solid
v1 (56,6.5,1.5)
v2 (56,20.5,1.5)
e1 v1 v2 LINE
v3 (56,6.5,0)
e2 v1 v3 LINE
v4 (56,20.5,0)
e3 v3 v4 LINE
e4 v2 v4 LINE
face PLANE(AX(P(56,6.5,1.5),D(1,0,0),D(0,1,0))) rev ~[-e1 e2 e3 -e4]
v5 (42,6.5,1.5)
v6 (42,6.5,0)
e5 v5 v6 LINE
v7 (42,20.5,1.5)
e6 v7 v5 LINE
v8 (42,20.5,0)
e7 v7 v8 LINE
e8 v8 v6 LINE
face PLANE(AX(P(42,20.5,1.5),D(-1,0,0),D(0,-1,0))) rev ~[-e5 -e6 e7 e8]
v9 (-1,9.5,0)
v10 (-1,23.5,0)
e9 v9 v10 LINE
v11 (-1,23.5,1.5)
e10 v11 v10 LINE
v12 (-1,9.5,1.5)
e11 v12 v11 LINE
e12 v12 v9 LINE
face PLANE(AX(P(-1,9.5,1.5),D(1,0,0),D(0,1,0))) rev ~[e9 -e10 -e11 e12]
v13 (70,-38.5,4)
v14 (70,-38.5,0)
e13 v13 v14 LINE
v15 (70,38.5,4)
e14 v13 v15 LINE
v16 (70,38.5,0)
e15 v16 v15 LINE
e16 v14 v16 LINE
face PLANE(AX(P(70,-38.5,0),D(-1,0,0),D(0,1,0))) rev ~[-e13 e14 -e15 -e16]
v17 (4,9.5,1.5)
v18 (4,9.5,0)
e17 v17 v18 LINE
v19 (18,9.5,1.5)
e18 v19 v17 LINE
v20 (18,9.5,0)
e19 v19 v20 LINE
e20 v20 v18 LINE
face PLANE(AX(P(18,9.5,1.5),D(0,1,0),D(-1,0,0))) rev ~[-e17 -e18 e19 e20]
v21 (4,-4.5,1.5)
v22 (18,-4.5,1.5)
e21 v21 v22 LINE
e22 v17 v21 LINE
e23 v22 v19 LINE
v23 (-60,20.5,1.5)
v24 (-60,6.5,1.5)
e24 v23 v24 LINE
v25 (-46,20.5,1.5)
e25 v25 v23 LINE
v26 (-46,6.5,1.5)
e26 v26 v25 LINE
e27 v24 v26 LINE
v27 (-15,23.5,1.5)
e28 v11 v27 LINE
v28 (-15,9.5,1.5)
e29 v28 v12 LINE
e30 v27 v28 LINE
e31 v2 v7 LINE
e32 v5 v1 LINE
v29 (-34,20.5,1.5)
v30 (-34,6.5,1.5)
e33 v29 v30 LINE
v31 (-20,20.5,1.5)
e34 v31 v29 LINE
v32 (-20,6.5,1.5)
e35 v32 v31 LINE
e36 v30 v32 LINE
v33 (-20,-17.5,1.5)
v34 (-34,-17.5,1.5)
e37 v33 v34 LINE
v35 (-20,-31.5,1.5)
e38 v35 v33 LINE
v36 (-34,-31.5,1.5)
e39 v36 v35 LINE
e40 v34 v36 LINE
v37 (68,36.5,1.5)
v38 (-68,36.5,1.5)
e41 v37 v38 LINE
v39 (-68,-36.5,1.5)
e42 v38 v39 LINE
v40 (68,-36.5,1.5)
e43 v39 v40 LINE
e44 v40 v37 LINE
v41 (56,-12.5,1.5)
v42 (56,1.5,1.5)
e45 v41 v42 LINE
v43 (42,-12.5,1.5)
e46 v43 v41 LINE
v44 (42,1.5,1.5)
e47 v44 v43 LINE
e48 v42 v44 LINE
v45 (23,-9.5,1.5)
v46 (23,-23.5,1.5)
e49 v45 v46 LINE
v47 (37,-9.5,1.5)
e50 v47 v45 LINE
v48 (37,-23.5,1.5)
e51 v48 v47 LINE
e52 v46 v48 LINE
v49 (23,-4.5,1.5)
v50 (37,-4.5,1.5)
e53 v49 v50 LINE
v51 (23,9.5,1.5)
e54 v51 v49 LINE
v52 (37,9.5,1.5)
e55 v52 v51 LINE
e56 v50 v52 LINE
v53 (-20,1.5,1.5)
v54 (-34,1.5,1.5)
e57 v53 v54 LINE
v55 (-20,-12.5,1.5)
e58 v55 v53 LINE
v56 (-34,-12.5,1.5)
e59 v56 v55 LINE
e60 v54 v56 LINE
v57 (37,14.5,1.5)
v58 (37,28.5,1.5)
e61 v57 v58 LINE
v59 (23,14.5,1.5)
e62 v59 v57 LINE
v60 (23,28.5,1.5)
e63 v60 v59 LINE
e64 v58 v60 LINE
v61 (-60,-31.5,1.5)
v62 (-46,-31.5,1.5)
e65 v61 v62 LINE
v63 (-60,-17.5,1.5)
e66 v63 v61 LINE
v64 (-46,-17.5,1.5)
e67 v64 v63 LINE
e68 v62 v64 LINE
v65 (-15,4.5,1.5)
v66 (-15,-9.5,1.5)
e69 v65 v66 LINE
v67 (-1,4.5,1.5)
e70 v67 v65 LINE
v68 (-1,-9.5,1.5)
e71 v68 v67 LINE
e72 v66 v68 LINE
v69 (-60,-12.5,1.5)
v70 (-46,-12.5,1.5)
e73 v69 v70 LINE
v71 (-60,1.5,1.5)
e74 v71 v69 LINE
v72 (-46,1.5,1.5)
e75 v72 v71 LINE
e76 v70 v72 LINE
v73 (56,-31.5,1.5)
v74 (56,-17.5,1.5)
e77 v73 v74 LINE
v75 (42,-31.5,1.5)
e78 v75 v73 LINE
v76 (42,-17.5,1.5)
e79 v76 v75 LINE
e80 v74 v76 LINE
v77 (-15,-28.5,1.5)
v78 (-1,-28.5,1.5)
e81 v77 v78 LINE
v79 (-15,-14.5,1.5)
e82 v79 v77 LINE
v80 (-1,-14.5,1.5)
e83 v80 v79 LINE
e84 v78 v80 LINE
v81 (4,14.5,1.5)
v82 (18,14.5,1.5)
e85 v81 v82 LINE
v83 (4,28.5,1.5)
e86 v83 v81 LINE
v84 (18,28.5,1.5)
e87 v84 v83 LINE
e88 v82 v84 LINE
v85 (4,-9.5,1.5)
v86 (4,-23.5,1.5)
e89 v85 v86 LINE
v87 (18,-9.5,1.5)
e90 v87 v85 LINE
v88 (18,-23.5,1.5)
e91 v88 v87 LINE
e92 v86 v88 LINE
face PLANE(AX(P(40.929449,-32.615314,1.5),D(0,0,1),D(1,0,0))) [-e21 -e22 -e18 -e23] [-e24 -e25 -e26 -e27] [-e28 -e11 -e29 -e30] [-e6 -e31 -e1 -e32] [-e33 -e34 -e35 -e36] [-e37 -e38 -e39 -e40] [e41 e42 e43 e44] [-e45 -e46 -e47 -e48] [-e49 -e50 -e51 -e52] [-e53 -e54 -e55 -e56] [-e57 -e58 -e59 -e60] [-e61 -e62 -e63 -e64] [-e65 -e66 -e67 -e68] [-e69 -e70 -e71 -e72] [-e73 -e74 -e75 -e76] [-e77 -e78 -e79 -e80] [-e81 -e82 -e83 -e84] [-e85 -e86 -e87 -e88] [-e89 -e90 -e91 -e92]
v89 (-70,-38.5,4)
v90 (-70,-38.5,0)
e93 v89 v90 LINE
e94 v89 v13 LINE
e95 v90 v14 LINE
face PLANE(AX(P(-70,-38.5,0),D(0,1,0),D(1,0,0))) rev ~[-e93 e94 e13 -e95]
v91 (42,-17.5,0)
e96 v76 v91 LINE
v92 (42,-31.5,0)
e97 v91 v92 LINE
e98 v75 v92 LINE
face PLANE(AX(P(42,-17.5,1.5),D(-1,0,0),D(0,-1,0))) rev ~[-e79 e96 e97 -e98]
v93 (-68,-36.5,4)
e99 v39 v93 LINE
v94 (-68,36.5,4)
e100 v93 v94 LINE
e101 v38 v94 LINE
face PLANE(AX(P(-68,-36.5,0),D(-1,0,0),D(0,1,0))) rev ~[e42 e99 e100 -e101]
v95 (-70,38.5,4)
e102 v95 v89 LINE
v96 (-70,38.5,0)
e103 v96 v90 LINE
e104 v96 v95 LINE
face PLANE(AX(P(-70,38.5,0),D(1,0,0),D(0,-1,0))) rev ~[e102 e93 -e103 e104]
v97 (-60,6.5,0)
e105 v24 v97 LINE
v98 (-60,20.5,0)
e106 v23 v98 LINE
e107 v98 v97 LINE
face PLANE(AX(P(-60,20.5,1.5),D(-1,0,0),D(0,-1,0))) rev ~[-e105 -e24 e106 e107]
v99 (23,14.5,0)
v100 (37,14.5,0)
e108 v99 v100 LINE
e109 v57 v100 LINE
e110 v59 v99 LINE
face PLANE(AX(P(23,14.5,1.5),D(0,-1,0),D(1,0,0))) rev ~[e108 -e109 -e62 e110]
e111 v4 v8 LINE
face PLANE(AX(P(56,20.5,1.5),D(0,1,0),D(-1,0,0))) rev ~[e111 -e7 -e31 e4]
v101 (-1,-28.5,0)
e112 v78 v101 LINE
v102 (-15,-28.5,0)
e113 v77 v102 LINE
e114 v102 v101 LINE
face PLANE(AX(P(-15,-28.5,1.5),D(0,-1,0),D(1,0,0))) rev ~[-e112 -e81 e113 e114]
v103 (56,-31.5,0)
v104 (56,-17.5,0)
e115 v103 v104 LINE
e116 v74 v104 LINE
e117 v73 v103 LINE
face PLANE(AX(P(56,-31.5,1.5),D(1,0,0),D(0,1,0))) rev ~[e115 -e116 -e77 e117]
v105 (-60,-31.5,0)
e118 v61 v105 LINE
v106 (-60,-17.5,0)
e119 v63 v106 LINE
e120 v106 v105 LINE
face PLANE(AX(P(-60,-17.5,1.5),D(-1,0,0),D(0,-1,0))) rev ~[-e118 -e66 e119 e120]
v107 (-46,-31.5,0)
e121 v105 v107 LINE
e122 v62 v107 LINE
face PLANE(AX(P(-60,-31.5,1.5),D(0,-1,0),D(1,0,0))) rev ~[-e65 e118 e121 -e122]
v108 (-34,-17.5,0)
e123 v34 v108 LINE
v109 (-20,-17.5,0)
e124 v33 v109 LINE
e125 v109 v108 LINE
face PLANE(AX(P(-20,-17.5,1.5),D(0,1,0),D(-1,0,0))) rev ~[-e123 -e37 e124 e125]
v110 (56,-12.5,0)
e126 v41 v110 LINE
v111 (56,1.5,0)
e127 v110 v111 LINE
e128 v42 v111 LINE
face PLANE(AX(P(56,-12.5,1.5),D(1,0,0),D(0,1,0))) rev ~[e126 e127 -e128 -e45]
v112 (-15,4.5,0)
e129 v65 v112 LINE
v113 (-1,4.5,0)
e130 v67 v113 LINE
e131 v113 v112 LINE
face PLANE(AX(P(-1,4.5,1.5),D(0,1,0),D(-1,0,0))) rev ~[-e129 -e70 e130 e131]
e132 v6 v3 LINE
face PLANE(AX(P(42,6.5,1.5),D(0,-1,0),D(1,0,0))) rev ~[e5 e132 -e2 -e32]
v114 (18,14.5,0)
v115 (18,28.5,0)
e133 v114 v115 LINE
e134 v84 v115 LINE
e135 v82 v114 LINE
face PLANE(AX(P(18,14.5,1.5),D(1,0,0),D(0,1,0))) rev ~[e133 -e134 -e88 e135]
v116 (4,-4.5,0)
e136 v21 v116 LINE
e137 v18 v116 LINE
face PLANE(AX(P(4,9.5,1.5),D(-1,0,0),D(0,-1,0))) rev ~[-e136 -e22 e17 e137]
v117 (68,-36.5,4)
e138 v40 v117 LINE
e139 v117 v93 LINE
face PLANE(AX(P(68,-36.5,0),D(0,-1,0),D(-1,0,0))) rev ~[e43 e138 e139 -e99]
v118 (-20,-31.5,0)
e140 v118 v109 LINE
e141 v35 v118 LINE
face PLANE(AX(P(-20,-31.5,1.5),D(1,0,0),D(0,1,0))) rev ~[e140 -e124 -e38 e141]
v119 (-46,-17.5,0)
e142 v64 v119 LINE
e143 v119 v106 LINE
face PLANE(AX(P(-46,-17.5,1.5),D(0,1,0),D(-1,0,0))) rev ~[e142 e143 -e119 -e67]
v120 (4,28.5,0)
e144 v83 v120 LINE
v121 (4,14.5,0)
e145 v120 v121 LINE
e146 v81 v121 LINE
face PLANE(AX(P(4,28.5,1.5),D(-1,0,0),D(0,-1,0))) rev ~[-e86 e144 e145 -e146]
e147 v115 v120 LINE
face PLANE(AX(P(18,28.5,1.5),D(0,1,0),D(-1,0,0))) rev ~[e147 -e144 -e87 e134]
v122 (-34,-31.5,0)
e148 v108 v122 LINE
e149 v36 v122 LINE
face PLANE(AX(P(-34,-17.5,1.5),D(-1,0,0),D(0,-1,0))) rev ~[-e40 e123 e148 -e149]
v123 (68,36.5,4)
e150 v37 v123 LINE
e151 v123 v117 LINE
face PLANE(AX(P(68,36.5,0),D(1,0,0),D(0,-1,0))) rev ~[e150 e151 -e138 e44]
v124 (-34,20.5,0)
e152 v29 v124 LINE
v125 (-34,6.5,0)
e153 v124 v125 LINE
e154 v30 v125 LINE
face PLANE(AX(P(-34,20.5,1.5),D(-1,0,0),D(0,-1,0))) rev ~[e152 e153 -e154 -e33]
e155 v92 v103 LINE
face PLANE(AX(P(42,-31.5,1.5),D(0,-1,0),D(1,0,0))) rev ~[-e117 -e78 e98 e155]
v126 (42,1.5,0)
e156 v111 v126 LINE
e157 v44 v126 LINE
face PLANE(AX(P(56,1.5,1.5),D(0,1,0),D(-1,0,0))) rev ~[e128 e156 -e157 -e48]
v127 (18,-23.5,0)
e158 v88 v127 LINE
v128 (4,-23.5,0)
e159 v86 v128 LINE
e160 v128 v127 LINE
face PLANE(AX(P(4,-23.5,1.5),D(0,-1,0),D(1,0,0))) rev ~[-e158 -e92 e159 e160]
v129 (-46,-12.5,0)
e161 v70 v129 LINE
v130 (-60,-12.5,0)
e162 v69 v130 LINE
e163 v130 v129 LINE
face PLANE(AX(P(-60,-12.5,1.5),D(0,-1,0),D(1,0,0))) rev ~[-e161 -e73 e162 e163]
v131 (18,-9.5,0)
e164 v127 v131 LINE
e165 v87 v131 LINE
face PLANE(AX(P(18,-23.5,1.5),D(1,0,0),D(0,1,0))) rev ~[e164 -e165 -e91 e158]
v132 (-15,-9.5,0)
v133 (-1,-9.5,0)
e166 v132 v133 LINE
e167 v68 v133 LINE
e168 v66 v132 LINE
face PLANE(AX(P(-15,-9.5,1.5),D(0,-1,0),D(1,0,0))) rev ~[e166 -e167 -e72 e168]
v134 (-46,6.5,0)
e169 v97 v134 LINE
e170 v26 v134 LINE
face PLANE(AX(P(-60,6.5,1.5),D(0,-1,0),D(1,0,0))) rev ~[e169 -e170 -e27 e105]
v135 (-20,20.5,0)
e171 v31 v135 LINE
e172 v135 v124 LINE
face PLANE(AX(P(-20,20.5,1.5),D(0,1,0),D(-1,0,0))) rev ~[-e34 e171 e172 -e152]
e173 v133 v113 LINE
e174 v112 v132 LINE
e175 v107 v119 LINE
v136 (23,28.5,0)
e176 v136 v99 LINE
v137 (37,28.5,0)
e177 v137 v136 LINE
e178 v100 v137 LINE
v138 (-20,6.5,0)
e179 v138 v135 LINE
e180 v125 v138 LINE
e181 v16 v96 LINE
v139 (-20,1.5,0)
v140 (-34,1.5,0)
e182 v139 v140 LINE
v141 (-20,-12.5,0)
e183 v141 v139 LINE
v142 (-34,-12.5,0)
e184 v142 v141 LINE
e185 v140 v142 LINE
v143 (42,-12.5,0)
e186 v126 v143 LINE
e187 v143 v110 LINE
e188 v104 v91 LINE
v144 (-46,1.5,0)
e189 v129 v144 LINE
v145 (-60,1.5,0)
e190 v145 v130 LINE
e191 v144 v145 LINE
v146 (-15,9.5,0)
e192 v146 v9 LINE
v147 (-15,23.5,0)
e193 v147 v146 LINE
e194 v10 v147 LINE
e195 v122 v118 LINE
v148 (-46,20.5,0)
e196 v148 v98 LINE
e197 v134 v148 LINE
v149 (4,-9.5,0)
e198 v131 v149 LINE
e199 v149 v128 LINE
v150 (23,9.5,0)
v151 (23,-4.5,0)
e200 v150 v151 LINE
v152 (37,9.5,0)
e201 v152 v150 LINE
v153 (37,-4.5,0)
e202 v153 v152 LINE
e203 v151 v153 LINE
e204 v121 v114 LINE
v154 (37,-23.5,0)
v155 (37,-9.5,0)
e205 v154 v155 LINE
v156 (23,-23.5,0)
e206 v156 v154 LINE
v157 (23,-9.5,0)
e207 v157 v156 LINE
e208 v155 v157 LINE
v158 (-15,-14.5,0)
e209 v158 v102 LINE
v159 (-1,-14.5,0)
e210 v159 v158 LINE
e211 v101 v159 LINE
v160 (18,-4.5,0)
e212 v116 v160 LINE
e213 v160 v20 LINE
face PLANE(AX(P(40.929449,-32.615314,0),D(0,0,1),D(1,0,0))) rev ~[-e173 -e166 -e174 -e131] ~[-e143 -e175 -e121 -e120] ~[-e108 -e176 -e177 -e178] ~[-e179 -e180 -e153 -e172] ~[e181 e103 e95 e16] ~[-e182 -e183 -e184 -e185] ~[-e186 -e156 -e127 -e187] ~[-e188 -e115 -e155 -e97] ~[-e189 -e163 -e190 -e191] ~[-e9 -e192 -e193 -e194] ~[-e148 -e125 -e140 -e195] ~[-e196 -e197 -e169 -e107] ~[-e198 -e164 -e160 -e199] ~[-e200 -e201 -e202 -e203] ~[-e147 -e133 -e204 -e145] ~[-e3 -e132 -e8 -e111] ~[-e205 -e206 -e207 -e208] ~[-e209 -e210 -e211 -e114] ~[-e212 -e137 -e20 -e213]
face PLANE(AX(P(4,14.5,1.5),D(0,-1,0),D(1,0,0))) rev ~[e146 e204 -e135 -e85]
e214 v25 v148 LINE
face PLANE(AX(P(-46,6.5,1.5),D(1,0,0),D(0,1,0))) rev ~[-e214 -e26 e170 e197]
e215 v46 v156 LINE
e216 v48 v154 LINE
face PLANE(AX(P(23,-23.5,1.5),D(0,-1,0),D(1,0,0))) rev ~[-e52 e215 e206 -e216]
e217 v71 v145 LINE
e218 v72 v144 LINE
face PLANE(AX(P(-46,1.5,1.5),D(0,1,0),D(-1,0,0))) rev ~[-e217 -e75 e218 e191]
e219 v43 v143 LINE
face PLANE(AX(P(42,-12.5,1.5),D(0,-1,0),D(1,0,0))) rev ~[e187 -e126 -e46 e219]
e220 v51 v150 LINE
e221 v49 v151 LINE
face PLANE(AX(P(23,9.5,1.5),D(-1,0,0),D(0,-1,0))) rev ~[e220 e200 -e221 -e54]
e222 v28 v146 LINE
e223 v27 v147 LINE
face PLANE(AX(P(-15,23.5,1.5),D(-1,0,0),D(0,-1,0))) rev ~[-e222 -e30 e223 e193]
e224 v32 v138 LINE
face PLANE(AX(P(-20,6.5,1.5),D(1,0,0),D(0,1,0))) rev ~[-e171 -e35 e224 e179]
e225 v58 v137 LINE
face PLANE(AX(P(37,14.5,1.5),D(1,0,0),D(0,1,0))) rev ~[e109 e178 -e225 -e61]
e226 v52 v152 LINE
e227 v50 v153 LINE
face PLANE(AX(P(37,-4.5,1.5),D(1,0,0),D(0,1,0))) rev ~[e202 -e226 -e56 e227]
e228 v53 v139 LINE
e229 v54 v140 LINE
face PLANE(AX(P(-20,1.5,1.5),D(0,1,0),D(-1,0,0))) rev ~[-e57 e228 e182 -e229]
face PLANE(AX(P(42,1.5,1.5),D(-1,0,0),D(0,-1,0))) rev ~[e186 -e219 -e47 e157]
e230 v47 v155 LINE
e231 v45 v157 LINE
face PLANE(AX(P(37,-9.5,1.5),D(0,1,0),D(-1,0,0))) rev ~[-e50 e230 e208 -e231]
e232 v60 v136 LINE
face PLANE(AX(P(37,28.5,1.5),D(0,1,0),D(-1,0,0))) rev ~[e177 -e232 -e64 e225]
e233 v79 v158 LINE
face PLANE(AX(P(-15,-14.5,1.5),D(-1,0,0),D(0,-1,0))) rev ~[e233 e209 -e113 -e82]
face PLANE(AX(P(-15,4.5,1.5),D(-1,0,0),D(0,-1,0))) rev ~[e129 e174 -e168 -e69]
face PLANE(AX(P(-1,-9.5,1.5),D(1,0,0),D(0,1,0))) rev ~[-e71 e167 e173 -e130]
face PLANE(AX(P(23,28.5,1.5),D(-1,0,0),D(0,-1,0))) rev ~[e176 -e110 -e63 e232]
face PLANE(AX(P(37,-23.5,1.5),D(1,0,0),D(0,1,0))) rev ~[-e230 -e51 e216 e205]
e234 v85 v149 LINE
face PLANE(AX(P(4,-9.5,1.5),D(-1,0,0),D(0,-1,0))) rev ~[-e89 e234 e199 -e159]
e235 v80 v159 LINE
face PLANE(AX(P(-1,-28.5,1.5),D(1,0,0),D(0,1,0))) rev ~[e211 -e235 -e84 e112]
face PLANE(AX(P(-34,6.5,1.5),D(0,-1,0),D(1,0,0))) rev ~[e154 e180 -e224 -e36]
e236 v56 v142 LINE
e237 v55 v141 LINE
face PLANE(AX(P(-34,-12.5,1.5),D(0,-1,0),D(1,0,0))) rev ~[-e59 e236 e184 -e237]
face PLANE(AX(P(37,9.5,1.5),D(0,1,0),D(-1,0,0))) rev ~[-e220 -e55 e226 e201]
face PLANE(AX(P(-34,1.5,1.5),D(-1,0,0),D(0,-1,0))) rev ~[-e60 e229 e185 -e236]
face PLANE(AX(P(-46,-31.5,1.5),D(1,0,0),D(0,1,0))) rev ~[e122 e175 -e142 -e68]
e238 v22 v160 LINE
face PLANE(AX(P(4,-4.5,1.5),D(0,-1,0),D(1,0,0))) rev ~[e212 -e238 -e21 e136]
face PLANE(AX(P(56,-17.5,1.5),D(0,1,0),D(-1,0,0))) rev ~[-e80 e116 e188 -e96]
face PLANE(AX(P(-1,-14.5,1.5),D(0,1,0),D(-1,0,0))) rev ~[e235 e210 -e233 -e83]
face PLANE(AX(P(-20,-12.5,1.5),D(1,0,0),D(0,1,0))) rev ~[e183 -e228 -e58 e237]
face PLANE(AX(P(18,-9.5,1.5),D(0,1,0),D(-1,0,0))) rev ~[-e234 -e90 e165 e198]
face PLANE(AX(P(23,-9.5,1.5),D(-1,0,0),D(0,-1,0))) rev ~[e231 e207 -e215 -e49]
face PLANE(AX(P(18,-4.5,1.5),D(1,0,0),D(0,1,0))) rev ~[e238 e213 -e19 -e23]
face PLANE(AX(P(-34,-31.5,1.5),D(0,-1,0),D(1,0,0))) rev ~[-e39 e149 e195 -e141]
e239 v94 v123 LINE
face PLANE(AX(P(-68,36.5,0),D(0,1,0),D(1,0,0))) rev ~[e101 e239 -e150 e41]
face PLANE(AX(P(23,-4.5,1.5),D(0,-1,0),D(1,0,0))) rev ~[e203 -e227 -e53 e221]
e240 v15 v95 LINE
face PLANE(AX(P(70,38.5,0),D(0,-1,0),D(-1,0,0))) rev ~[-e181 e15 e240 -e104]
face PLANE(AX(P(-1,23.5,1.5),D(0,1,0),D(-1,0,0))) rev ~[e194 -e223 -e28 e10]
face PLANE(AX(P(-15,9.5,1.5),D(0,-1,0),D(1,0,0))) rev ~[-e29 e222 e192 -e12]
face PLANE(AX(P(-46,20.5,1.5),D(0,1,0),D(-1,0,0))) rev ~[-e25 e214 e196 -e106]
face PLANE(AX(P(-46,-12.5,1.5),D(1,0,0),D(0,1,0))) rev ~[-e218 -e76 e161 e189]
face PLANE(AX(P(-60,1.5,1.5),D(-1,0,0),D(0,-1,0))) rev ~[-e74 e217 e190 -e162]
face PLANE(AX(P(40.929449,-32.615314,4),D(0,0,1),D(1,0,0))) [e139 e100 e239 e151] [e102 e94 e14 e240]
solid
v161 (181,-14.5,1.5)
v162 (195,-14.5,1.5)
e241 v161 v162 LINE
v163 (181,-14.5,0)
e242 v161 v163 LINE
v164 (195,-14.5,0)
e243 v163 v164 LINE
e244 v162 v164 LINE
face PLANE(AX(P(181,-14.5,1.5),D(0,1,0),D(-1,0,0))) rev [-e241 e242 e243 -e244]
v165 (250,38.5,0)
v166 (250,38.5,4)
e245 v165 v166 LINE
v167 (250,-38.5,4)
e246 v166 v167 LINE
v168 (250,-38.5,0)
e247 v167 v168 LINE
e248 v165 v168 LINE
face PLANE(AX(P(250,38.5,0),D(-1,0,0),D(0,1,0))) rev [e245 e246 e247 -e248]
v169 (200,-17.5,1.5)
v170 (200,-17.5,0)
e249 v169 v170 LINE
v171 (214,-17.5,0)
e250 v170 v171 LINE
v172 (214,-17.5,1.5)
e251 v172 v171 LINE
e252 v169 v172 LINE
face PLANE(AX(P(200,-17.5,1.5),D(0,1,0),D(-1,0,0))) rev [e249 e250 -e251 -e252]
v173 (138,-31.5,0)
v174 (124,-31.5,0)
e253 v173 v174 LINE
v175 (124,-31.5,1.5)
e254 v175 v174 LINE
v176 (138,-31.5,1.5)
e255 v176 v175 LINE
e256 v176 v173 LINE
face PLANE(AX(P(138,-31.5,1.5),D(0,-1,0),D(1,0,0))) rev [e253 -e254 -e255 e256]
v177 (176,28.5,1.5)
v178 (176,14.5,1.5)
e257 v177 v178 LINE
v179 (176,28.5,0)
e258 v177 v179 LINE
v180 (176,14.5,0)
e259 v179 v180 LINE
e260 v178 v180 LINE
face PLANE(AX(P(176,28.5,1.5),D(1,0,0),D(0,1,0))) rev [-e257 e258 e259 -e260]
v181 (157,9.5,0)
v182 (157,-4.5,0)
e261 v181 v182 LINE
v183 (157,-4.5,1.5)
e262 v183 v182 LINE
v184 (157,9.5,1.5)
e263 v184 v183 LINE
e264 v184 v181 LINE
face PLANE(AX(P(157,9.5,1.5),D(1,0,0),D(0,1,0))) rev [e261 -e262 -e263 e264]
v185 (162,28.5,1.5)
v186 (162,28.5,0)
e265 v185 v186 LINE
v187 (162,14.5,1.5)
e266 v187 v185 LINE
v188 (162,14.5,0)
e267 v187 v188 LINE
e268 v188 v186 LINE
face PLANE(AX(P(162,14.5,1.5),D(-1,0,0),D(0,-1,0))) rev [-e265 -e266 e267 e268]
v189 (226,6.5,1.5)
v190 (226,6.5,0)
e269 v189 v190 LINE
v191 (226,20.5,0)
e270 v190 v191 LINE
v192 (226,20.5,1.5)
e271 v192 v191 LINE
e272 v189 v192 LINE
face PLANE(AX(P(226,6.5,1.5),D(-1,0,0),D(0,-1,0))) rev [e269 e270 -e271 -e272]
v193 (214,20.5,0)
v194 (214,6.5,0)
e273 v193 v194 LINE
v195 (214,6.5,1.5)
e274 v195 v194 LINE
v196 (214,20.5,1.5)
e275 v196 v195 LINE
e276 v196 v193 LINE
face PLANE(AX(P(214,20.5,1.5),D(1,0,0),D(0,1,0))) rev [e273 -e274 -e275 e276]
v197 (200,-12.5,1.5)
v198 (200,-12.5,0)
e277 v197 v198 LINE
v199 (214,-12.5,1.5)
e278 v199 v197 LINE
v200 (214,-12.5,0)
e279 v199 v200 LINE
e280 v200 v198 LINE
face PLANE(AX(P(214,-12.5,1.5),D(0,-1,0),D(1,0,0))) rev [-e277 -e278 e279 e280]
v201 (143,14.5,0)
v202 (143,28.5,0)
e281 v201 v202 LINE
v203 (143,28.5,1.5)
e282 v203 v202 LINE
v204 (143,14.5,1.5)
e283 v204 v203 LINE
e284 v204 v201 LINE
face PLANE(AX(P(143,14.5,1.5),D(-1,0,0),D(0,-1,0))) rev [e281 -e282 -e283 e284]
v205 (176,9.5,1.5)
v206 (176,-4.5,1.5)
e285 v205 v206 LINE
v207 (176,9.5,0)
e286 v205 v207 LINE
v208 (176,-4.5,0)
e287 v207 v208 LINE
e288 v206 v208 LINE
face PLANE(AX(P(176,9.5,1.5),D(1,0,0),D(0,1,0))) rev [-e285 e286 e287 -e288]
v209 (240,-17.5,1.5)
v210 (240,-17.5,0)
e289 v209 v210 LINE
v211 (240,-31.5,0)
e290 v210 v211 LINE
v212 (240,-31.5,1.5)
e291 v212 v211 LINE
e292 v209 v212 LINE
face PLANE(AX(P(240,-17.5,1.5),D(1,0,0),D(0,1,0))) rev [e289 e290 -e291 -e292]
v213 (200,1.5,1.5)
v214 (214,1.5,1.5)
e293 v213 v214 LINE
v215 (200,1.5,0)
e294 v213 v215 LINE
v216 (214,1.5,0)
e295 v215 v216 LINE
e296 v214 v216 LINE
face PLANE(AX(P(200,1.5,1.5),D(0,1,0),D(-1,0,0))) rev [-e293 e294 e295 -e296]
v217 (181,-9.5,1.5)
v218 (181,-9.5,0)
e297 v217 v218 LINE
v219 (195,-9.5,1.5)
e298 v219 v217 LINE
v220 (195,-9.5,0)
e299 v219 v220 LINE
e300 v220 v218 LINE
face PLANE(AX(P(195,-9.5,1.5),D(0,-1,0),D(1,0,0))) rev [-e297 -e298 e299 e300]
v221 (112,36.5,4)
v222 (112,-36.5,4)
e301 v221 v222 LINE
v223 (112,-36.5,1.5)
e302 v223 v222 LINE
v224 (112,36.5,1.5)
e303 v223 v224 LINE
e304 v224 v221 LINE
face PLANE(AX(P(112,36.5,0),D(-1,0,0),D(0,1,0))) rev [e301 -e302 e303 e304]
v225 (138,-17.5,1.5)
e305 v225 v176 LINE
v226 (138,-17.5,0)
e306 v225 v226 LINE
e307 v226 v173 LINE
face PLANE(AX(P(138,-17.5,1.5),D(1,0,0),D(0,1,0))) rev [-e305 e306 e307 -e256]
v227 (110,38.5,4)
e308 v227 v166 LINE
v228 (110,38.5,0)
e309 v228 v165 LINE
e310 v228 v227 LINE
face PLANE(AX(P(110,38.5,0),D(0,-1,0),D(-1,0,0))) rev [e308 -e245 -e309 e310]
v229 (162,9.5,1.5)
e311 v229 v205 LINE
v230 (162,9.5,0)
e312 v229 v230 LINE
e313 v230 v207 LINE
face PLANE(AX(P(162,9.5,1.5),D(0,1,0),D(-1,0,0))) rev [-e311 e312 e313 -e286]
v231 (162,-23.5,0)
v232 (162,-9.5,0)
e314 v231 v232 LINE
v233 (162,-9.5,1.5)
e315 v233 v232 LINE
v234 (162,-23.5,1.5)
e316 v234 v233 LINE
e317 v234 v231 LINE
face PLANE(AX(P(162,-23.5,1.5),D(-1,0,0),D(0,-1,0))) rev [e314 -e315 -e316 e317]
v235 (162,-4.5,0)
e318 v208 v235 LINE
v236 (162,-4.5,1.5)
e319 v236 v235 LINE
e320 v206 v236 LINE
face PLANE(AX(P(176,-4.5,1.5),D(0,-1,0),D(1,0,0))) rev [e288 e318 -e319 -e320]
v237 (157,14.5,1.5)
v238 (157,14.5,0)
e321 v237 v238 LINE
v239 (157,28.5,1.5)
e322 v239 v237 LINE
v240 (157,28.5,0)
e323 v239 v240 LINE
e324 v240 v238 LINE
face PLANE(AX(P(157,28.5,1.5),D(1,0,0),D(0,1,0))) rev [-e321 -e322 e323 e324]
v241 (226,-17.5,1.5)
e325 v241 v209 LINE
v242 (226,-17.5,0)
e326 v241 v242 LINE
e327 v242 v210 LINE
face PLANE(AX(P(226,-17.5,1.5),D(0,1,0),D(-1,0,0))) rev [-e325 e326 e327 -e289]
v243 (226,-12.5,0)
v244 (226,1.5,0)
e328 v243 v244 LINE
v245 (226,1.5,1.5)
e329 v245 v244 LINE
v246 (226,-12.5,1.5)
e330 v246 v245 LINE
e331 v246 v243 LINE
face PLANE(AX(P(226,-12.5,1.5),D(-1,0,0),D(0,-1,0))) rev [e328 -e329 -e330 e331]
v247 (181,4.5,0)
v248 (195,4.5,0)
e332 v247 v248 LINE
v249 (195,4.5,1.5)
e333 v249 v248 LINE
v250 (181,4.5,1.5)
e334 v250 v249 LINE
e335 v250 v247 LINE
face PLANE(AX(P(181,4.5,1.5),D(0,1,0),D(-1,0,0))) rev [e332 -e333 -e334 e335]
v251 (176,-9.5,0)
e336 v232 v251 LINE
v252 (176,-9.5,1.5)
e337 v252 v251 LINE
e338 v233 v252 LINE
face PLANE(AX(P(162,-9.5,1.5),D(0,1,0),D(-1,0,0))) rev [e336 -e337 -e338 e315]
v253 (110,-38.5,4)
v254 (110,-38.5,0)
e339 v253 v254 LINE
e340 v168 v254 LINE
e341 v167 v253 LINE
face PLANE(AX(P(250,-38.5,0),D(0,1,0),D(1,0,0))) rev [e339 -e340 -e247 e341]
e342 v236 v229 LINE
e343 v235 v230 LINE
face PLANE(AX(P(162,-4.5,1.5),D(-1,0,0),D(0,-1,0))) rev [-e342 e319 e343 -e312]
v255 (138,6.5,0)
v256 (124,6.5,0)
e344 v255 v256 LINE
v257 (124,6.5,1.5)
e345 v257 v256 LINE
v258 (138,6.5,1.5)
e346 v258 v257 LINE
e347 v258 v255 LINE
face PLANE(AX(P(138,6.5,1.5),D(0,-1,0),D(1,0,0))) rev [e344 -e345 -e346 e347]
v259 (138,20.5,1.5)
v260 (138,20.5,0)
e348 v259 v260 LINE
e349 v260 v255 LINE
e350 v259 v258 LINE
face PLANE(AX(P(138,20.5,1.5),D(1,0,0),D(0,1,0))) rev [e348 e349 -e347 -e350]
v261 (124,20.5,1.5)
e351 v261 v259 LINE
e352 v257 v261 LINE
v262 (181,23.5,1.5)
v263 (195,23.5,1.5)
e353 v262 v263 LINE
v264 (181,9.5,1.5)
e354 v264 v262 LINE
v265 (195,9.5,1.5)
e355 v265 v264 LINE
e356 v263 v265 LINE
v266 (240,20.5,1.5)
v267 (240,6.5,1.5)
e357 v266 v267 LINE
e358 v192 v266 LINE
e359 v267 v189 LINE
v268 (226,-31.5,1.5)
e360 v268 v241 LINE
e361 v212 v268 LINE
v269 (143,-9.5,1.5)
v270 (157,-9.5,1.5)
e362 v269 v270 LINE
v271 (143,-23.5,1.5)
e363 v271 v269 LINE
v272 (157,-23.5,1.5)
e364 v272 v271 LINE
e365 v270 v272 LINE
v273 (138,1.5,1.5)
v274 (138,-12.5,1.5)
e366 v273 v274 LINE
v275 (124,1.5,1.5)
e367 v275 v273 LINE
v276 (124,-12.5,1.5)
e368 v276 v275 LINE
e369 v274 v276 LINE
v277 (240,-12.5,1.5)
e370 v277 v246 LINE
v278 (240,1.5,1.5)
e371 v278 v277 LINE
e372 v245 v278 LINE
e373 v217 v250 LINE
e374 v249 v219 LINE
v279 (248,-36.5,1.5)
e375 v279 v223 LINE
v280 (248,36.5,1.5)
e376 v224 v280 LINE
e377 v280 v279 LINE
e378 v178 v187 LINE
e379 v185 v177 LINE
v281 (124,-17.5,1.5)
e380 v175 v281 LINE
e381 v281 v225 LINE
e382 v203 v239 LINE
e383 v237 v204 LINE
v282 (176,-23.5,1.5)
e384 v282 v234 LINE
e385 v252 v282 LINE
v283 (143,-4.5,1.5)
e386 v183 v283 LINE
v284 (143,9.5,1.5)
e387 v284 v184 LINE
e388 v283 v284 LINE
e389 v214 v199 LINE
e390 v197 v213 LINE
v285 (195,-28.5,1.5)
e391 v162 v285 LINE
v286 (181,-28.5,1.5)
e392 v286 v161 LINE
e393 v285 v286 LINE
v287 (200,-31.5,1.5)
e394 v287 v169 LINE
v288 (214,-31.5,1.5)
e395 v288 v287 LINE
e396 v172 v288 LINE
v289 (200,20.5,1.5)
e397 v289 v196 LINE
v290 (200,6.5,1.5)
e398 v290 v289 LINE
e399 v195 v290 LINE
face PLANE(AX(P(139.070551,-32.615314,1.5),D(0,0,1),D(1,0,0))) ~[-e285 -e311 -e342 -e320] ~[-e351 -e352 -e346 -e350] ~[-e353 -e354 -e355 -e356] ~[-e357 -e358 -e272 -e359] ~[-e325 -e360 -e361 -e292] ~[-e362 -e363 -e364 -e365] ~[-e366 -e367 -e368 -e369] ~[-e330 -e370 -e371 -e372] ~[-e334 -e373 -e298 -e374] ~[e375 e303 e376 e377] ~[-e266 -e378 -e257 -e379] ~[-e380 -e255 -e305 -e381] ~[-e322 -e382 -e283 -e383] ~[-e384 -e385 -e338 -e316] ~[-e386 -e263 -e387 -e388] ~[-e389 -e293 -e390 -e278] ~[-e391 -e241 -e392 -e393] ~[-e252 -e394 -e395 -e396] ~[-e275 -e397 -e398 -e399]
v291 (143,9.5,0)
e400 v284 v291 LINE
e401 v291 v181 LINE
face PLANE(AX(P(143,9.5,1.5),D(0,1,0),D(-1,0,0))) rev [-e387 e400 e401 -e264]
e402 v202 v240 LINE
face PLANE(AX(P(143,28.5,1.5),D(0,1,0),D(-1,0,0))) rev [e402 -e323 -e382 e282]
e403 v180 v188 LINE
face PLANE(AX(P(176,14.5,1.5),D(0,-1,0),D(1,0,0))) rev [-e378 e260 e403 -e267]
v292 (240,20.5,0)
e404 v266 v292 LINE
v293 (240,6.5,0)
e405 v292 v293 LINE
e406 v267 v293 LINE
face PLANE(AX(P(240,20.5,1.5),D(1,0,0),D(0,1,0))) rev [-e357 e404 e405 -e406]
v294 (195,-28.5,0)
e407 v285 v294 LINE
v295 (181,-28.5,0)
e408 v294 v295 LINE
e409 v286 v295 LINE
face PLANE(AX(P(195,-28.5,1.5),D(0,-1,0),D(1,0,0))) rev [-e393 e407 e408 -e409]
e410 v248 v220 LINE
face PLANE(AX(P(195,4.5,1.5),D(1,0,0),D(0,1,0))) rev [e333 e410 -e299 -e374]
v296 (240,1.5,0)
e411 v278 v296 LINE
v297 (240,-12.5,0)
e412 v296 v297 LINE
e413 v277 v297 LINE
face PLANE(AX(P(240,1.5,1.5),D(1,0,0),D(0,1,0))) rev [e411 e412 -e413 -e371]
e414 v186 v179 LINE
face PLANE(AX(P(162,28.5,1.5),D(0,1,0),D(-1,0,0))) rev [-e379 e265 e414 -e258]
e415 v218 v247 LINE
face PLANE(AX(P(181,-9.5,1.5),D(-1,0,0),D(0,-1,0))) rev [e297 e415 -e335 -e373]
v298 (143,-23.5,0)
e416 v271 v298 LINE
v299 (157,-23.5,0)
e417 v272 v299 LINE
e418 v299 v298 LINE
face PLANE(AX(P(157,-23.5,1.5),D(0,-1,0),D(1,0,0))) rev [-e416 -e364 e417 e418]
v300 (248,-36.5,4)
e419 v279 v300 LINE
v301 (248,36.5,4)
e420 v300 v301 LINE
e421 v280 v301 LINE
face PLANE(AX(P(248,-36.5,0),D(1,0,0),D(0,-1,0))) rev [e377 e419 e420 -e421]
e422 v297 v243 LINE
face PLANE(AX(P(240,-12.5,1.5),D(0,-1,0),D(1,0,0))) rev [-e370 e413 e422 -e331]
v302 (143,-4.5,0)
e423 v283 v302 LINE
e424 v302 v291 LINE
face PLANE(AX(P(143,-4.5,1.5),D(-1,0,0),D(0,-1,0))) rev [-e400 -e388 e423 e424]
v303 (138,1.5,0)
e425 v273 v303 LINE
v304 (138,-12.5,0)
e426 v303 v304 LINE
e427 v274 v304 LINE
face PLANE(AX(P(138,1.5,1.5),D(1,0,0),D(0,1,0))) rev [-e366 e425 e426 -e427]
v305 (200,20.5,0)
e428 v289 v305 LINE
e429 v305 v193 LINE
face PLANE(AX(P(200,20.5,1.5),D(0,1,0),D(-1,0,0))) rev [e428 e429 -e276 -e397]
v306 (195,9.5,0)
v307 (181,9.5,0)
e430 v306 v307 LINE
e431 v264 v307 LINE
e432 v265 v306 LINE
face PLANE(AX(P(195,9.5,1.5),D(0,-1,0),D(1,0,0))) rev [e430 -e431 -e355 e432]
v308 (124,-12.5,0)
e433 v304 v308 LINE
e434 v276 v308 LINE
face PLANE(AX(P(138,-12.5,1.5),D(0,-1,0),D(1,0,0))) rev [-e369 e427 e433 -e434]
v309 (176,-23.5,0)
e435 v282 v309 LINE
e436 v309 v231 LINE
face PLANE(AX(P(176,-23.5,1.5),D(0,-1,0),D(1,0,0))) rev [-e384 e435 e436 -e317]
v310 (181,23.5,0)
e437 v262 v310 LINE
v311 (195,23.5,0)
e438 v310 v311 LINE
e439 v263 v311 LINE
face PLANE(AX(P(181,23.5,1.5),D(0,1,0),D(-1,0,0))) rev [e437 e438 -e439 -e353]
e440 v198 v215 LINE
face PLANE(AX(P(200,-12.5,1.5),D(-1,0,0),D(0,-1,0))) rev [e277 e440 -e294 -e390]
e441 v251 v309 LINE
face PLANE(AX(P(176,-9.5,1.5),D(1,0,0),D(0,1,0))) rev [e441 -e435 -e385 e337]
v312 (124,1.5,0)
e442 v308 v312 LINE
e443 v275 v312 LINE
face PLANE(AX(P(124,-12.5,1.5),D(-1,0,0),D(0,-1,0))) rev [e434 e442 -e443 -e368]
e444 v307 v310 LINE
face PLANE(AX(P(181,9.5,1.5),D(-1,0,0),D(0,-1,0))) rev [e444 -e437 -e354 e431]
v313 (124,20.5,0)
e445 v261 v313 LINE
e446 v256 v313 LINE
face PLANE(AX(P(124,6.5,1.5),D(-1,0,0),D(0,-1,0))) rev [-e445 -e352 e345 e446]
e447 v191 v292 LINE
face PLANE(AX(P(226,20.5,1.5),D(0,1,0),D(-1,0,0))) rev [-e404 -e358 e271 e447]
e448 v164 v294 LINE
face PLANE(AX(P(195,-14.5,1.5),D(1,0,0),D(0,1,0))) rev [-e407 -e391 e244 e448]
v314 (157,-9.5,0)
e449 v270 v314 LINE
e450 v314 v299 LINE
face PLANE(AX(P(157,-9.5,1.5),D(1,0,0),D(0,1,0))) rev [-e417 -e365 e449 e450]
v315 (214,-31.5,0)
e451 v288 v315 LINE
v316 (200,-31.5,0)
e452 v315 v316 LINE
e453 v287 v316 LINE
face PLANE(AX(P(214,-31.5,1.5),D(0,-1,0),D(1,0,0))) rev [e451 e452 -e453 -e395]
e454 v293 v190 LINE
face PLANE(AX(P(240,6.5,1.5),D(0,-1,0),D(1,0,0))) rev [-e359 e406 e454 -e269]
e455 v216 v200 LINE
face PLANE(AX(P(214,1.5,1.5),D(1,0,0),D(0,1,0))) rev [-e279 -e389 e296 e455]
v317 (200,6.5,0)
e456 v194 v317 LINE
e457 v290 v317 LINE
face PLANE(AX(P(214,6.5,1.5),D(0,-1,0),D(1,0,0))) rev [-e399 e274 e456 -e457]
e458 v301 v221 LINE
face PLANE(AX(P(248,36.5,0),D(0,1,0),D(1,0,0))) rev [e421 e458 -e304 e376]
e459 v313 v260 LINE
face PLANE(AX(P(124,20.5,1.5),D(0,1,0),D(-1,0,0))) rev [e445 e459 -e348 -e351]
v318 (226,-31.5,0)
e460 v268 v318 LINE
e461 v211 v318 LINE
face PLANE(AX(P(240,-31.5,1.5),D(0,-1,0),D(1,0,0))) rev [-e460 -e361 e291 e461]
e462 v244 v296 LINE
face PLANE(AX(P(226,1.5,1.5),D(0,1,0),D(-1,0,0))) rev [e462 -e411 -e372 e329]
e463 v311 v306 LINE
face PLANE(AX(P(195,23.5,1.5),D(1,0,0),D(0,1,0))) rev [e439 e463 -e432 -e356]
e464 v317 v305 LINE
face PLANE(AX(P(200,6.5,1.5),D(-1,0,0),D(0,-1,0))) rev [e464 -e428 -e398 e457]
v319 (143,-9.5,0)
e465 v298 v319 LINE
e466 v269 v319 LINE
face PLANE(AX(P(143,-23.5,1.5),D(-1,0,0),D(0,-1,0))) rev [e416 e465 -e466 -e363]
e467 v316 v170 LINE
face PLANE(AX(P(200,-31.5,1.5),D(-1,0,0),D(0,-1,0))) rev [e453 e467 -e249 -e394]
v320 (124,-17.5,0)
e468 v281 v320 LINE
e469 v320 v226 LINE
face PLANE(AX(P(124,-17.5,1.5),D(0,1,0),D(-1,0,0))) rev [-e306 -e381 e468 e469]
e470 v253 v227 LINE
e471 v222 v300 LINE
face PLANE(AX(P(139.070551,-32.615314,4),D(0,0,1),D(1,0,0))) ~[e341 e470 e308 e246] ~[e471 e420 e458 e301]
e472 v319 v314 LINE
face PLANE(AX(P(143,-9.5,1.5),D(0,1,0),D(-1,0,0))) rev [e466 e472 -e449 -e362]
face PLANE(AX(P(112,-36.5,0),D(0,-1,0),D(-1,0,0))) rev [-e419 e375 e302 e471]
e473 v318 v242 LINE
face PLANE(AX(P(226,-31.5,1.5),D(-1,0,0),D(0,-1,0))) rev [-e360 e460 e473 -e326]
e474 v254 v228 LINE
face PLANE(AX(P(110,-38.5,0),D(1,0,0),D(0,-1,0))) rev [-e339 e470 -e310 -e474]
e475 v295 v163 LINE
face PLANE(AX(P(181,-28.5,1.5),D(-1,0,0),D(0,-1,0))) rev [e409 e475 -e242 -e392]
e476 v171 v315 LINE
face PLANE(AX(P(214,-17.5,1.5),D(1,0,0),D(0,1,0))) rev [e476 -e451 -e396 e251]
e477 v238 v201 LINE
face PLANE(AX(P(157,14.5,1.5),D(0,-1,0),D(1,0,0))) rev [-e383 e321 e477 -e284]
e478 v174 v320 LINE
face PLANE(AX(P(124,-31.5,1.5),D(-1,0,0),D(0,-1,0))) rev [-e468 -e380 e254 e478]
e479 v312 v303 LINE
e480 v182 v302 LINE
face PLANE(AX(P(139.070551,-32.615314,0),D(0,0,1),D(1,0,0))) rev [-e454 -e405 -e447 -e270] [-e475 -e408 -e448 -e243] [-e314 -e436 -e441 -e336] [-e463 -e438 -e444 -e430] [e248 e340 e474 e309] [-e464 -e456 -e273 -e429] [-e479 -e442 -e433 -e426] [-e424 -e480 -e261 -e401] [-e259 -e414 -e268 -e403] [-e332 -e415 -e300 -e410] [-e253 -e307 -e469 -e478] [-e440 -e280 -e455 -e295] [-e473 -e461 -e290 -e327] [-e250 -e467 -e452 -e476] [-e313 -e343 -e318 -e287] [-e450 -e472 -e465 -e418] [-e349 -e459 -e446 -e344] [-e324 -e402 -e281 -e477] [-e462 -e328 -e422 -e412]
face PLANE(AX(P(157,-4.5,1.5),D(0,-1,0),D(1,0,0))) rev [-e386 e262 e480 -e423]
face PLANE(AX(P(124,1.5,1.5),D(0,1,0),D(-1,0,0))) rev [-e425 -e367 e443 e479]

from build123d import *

# Parameters (mm, degrees)
F1_DEPTH = 1.5
F3_DEPTH = 25
F4_DEPTH = 4


# Not quite as in the source:
# - a feature names something its author has since deleted; it is built from what else it names


with BuildPart() as f1:
    # F0 (on Top) → F1 (new body)
    with BuildSketch(Plane.XY):
        Polygon((-9.6456400305, -38.5), (70, -38.5), (70, -5.2260886878), (68, -5.2260886878), (68, -36.5), (-9.6456400305, -36.5), align=None)
        Polygon((-70, -38.5), (-9.6456400305, -38.5), (-9.6456400305, -36.5), (-68, -36.5), (-68, 2.6378679238), (-70, 2.6378679238), align=None)
        Polygon((-70, 38.5), (-70, 2.6378679238), (-68, 2.6378679238), (-68, 36.5), (-20.2697571367, 36.5), (-20.2697571367, 38.5), align=None)
        Polygon((68, -5.2260886878), (70, -5.2260886878), (70, 38.5), (-20.2697571367, 38.5), (-20.2697571367, 36.5), (68, 36.5), align=None)
        Polygon((-68, -36.5), (-9.6456400305, -36.5), (68, -36.5), (68, -5.2260886878), (68, 36.5), (-20.2697571367, 36.5), (-68, 36.5), (-68, 2.6378679238), align=None)
    extrude(amount=F1_DEPTH)

    # F2 (on face) → F3 (cut)
    with BuildSketch(Plane.XY.offset(1.5)):
        Polygon((56, -17.5), (49, -17.5), (42, -17.5), (42, -31.5), (56, -31.5), align=None)
        Polygon((-1, 23.5), (-8, 23.5), (-15, 23.5), (-15, 17.9919603638), (-15, 9.5), (-8, 9.5), (-1, 9.5), (-1, 14.5402538426), align=None)
        Polygon((-1, 4.5), (-8, 4.5), (-15, 4.5), (-15, -1.0080396362), (-15, -9.5), (-8, -9.5), (-1, -9.5), (-1, 0.6484970983), align=None)
        Polygon((-1, -14.5), (-8, -14.5), (-15, -14.5), (-15, -14.8997963805), (-15, -28.5), (-1, -28.5), align=None)
        Polygon((18, 28.5), (11, 28.5), (4, 28.5), (4, 14.5402538426), (4, 14.5), (11, 14.5), (18, 14.5), (18, 19.3217483706), align=None)
        Polygon((18, 9.5), (11, 9.5), (4, 9.5), (4, -4.5), (11, -4.5), (18, -4.5), (18, 0.3217483706), align=None)
        Polygon((18, -9.5), (11, -9.5), (4, -9.5), (4, -23.5), (18, -23.5), (18, -13.5700083736), align=None)
        Polygon((37, -9.5), (30, -9.5), (23, -9.5), (23, -23.5), (37, -23.5), align=None)
        Polygon((56, 1.5), (49, 1.5), (42, 1.5), (42, -12.5), (49, -12.5), (56, -12.5), align=None)
        Polygon((56, 20.5), (49, 20.5), (42, 20.5), (42, 20.1662803835), (42, 6.5), (49, 6.5), (56, 6.5), align=None)
        Polygon((-53, 6.5), (-46, 6.5), (-46, 20.5), (-53, 20.5), (-60, 20.5), (-60, 6.5), align=None)
        Polygon((-46, -17.5), (-53, -17.5), (-60, -17.5), (-60, -31.5), (-46, -31.5), align=None)
        Polygon((-46, 1.5), (-53, 1.5), (-60, 1.5), (-60, -12.5), (-53, -12.5), (-46, -12.5), align=None)
        Polygon((-20, -17.5), (-27, -17.5), (-34, -17.5), (-34, -31.5), (-20, -31.5), align=None)
        Polygon((-20, 20.5), (-27, 20.5), (-34, 20.5), (-34, 6.5), (-27, 6.5), (-20, 6.5), (-20, 17.9919603638), align=None)
        Polygon((-20, 1.5), (-27, 1.5), (-34, 1.5), (-34, -12.5), (-27, -12.5), (-20, -12.5), (-20, -1.0080396362), align=None)
        Polygon((37, 28.5), (30, 28.5), (23, 28.5), (23, 19.3217483706), (23, 14.5), (30, 14.5), (37, 14.5), (37, 20.1662803835), align=None)
        Polygon((37, 9.5), (30, 9.5), (23, 9.5), (23, 0.3217483706), (23, -4.5), (30, -4.5), (37, -4.5), (37, 6.2745236393), align=None)
    extrude(amount=-F3_DEPTH, mode=Mode.SUBTRACT)

    # F0 (on Top) → F4 (join)
    with BuildSketch(Plane.XY):
        Polygon((-9.6456400305, -38.5), (70, -38.5), (70, -5.2260886878), (68, -5.2260886878), (68, -36.5), (-9.6456400305, -36.5), align=None)
        Polygon((-70, -38.5), (-9.6456400305, -38.5), (-9.6456400305, -36.5), (-68, -36.5), (-68, 2.6378679238), (-70, 2.6378679238), align=None)
        Polygon((68, -5.2260886878), (70, -5.2260886878), (70, 38.5), (-20.2697571367, 38.5), (-20.2697571367, 36.5), (68, 36.5), align=None)
        Polygon((-70, 38.5), (-70, 2.6378679238), (-68, 2.6378679238), (-68, 36.5), (-20.2697571367, 36.5), (-20.2697571367, 38.5), align=None)
    extrude(amount=F4_DEPTH)


with BuildPart() as f6_1:
    # F6: instance of F1
    add(f1.part.mirror(Plane.YZ.offset(90)))


solid = Compound([f1.part, f6_1.part])
